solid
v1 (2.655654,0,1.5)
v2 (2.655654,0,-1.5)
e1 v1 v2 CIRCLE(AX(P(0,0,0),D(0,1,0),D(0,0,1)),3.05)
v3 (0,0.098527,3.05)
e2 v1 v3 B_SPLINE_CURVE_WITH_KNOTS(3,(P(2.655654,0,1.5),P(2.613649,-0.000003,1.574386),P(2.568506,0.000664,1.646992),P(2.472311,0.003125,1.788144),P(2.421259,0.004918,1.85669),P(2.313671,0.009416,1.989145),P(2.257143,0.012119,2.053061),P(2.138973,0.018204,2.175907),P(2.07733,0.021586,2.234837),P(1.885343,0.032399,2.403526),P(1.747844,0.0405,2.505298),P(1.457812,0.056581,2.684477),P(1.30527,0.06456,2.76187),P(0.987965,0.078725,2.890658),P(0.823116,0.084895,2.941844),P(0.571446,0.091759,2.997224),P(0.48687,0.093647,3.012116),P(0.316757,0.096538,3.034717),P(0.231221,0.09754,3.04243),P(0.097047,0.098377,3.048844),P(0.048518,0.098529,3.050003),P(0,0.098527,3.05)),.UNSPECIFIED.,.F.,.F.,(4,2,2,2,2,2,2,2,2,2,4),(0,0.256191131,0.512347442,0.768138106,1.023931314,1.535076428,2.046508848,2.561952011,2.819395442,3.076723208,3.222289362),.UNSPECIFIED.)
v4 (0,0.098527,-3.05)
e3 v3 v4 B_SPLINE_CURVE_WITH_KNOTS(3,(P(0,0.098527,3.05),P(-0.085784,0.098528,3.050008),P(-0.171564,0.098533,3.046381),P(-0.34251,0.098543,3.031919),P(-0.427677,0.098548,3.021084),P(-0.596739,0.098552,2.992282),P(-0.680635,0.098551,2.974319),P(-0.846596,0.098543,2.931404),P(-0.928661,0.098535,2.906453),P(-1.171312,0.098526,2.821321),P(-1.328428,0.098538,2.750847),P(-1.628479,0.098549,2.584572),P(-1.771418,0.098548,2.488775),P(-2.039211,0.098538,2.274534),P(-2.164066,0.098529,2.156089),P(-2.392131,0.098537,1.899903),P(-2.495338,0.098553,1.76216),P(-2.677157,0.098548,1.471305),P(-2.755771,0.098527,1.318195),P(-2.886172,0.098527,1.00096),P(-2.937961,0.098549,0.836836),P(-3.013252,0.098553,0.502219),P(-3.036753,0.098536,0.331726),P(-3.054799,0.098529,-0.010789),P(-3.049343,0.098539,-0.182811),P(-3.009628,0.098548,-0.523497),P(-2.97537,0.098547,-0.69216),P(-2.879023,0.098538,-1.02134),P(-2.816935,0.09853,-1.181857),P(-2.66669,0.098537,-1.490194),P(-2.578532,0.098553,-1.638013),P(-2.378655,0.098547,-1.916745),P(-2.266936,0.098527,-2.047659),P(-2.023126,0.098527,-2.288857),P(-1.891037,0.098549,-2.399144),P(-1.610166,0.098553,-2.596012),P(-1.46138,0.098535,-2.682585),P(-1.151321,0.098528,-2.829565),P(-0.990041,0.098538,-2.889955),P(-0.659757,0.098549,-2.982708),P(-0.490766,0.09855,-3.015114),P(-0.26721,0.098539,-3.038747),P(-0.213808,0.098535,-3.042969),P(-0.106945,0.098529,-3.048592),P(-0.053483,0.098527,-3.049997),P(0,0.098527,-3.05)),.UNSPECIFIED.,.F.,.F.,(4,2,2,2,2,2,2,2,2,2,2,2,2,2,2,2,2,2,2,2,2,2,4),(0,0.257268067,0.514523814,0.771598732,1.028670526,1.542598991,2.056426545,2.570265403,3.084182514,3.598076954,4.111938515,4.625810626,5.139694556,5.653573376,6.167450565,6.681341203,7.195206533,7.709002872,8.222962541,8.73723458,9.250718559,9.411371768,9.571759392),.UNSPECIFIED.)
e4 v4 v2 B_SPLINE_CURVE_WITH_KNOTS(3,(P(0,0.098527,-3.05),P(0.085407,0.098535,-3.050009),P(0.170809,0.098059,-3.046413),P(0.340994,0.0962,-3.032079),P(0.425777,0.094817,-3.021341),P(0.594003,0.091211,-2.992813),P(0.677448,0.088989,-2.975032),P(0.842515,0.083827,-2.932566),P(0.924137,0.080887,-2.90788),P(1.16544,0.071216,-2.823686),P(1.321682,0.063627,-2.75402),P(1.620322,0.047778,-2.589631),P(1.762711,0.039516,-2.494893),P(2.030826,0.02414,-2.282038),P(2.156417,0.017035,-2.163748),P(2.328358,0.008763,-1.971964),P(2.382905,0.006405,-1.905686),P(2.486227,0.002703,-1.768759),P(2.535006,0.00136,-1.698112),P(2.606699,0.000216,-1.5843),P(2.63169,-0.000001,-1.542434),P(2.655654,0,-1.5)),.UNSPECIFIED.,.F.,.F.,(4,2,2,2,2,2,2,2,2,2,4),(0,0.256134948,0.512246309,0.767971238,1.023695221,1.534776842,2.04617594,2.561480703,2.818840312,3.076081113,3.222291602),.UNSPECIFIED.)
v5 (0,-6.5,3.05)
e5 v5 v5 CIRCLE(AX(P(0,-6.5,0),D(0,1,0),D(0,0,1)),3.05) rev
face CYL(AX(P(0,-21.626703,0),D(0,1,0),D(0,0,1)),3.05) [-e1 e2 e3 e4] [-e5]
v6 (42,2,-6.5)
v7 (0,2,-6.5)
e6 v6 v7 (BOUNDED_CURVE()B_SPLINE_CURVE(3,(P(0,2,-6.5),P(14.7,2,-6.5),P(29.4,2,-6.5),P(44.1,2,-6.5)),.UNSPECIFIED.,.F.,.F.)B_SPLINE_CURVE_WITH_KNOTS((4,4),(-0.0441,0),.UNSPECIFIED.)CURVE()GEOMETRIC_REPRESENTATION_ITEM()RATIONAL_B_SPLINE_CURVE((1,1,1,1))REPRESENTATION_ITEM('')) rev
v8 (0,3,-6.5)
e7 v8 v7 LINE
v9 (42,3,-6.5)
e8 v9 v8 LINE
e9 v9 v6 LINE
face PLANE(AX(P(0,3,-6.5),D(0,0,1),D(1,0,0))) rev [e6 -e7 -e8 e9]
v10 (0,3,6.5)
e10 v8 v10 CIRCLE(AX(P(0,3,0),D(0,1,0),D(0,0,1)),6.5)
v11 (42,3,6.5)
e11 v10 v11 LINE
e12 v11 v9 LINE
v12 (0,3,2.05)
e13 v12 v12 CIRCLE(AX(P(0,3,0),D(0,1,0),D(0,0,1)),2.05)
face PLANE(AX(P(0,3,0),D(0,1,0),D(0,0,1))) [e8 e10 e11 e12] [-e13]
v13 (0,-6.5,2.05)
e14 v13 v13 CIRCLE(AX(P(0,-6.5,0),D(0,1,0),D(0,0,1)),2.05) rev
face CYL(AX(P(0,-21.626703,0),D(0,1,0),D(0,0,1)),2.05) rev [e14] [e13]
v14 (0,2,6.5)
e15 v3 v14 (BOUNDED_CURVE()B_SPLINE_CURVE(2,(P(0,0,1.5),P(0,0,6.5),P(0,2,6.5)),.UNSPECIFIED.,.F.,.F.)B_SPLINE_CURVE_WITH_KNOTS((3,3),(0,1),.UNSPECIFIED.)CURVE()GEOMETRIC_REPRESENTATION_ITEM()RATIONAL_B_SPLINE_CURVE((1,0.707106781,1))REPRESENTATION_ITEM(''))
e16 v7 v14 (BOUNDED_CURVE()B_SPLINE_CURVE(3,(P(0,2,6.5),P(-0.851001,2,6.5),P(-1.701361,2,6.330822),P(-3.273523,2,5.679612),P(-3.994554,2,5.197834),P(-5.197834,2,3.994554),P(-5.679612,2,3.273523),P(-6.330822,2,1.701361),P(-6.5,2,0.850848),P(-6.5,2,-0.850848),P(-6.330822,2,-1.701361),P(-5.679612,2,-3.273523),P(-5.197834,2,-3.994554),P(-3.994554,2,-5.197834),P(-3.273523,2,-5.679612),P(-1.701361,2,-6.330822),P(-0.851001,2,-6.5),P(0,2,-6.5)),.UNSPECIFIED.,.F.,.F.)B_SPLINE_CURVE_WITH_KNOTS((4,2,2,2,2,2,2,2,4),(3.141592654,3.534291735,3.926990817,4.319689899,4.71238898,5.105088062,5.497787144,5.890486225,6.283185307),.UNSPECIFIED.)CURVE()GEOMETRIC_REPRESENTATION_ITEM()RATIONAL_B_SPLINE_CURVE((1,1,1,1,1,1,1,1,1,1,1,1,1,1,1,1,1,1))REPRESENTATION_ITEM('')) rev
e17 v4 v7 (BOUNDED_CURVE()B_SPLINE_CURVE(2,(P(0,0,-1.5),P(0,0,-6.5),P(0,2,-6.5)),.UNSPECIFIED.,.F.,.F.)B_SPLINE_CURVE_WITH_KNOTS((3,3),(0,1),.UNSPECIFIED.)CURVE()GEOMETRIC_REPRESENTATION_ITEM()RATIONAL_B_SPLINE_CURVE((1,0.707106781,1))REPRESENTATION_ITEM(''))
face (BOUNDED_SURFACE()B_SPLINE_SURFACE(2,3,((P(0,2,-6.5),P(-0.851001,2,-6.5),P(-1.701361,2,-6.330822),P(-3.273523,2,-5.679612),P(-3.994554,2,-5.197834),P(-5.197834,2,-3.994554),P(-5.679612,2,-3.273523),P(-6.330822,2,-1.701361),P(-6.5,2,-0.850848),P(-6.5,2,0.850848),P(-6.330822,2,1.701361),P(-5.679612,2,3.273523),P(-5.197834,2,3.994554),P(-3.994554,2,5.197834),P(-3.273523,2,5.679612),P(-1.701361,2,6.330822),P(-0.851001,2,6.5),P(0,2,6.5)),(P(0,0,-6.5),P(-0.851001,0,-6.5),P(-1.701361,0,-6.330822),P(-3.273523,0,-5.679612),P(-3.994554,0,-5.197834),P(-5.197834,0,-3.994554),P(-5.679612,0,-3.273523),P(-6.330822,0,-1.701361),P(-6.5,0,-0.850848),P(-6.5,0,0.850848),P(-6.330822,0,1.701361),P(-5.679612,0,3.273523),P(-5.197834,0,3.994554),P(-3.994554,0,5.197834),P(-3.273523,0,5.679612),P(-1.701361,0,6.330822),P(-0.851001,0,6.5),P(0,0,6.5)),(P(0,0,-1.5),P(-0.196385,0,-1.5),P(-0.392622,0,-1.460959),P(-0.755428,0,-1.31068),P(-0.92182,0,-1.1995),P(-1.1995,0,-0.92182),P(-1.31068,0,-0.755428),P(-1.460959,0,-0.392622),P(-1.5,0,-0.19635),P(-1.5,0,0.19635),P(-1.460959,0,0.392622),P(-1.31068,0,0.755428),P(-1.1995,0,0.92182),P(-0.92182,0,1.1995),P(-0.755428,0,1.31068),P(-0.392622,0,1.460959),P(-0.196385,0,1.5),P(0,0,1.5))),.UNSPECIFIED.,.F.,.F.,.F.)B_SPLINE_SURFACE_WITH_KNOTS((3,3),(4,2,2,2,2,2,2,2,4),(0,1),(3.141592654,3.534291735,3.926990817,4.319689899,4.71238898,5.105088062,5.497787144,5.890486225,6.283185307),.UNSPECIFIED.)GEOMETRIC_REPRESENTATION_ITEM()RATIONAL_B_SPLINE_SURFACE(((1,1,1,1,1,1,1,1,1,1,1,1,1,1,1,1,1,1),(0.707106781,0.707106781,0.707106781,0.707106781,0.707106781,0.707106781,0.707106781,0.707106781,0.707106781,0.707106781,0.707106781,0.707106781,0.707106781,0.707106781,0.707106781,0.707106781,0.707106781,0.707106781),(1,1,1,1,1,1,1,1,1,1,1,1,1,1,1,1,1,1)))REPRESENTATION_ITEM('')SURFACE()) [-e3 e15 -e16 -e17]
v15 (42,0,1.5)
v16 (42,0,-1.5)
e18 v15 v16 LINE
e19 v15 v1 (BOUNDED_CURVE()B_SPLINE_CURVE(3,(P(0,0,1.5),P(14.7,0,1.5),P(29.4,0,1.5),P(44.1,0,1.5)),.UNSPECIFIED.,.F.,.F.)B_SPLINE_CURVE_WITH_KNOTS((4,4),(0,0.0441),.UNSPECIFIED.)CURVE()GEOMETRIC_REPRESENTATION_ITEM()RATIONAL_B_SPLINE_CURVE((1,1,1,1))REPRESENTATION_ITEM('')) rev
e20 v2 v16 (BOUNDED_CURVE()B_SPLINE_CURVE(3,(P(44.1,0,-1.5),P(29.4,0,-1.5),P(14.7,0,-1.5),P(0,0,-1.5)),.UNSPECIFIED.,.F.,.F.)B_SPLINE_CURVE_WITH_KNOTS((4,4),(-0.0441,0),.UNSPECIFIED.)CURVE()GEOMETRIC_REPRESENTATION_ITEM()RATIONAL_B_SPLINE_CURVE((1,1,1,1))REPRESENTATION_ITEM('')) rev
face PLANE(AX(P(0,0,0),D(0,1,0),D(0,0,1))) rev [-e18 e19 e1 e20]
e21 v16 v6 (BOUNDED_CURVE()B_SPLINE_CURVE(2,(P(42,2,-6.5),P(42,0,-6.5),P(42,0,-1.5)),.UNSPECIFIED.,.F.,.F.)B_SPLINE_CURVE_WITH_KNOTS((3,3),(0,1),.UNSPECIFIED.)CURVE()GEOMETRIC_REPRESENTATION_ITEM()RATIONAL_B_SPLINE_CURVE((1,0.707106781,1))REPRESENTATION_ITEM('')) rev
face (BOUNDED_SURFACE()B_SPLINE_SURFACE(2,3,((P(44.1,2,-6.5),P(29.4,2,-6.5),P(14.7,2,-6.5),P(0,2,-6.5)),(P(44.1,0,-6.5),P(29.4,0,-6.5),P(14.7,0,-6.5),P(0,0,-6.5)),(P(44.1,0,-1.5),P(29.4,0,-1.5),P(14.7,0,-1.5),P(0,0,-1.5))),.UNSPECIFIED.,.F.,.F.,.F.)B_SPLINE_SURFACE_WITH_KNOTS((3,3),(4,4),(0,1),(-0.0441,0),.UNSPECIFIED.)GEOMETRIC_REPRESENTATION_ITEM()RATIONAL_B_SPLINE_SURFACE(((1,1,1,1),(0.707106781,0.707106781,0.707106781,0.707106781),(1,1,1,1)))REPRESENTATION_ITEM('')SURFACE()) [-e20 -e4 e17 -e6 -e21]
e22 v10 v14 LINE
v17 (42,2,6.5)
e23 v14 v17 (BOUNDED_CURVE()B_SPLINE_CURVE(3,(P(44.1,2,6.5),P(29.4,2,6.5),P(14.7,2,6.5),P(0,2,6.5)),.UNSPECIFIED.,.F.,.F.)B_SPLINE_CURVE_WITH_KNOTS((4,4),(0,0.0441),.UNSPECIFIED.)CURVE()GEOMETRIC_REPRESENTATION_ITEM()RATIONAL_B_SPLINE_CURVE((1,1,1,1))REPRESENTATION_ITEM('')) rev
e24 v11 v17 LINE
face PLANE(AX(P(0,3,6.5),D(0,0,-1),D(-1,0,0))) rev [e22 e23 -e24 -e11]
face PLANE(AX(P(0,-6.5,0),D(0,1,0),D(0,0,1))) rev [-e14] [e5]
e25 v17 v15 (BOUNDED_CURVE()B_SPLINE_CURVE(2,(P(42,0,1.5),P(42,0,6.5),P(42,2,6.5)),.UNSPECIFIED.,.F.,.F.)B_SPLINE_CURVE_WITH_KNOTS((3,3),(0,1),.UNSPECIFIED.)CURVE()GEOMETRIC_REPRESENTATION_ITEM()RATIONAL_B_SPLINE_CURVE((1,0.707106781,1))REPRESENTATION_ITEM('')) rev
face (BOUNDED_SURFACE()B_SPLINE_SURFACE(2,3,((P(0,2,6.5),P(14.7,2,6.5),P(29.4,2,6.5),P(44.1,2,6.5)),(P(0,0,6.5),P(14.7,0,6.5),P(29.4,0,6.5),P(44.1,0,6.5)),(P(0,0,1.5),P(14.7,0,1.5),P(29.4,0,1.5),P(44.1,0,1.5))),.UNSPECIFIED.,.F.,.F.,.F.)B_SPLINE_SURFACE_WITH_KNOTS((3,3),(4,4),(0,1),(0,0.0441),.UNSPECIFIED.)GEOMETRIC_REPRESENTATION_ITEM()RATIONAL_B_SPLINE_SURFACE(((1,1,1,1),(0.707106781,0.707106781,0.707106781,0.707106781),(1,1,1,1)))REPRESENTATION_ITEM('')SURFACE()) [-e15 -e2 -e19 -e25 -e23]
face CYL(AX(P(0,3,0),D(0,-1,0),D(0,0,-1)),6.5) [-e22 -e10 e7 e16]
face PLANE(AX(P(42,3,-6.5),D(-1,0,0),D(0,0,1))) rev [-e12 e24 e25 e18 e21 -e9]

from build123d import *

# Parameters (mm, degrees)
BOSS_EXTRUDE1_DEPTH = 3
FILLET1_SIZE        = 2
FILLET1_SIZE_2      = 5
SKETCH2_R           = 3.05
SKETCH2_R_2         = 2.05
BOSS_EXTRUDE3_DEPTH = 9.5
SKETCH3_R           = 2.05
CUT_EXTRUDE1_DEPTH  = 44.548823309


with BuildPart() as part:
    # Sketch1 → Boss-Extrude1 (new body)
    with BuildSketch(Plane(origin=(0, 0, 0), x_dir=(1, 0, 0), z_dir=(0, 1, 0))):
        with BuildLine():
            Line((0, 6.5), (42, 6.5))
            Line((42, 6.5), (42, -6.5))
            Line((42, -6.5), (0, -6.5))
            ThreePointArc((0, -6.5), (-6.5, 0), (0, 6.5))
        make_face()
    extrude(amount=BOSS_EXTRUDE1_DEPTH)

    # Fillet1
    # an asymmetric fillet: 5, 2 mm, written as the material it takes off along each edge
    with BuildSketch(Plane(origin=(0, 0, -6.5), x_dir=(0, 1, 0), z_dir=(1, 0, 0)), Plane(origin=(54.5, 0, 6.5), x_dir=(0, 1, 0), z_dir=(-1, 0, 0))) as fillet1_piece_1:
        with BuildLine():
            Bezier((FILLET1_SIZE, 0), (0, 0), (0, FILLET1_SIZE_2), weights=[1, 0.707106781, 1])
            Line((0, FILLET1_SIZE_2), (0, 0))
            Line((0, 0), (FILLET1_SIZE, 0))
        make_face()
    extrude(amount=54.5, mode=Mode.SUBTRACT)
    with BuildSketch(Plane(origin=(0, 0, 0), x_dir=(0, 0, 1), z_dir=(1, 0, 0))) as fillet1_piece_2:
        with BuildLine():
            Bezier((6.5, -FILLET1_SIZE), (6.5, 0), (6.5 - FILLET1_SIZE_2, 0), weights=[1, 0.707106781, 1])
            Line((6.5 - FILLET1_SIZE_2, 0), (6.5, 0))
            Line((6.5, 0), (6.5, -FILLET1_SIZE))
        make_face()
    revolve(axis=Axis((0, 0, 0), (0, -1, 0)), revolution_arc=180, mode=Mode.SUBTRACT)

    # Sketch2 → Boss-Extrude3 (add)
    with BuildSketch(Plane(origin=(0, 3, 0), x_dir=(1, 0, 0), z_dir=(0, 1, 0))):
        with Locations(Location((0, 0, 0), (0, 0, 270))):
            Circle(SKETCH2_R)
        with Locations(Location((0, 0, 0), (0, 0, 270))):
            Circle(SKETCH2_R_2, mode=Mode.SUBTRACT)
    extrude(amount=-BOSS_EXTRUDE3_DEPTH)

    # Sketch3 → Cut-Extrude1 (cut, through all)
    with BuildSketch(Plane(origin=(0, 3, 0), x_dir=(1, 0, 0), z_dir=(0, 1, 0))):
        with Locations(Location((0, 0, 0), (0, 0, 270))):
            Circle(SKETCH3_R)
    extrude(amount=-CUT_EXTRUDE1_DEPTH, mode=Mode.SUBTRACT)


solid = part.part
